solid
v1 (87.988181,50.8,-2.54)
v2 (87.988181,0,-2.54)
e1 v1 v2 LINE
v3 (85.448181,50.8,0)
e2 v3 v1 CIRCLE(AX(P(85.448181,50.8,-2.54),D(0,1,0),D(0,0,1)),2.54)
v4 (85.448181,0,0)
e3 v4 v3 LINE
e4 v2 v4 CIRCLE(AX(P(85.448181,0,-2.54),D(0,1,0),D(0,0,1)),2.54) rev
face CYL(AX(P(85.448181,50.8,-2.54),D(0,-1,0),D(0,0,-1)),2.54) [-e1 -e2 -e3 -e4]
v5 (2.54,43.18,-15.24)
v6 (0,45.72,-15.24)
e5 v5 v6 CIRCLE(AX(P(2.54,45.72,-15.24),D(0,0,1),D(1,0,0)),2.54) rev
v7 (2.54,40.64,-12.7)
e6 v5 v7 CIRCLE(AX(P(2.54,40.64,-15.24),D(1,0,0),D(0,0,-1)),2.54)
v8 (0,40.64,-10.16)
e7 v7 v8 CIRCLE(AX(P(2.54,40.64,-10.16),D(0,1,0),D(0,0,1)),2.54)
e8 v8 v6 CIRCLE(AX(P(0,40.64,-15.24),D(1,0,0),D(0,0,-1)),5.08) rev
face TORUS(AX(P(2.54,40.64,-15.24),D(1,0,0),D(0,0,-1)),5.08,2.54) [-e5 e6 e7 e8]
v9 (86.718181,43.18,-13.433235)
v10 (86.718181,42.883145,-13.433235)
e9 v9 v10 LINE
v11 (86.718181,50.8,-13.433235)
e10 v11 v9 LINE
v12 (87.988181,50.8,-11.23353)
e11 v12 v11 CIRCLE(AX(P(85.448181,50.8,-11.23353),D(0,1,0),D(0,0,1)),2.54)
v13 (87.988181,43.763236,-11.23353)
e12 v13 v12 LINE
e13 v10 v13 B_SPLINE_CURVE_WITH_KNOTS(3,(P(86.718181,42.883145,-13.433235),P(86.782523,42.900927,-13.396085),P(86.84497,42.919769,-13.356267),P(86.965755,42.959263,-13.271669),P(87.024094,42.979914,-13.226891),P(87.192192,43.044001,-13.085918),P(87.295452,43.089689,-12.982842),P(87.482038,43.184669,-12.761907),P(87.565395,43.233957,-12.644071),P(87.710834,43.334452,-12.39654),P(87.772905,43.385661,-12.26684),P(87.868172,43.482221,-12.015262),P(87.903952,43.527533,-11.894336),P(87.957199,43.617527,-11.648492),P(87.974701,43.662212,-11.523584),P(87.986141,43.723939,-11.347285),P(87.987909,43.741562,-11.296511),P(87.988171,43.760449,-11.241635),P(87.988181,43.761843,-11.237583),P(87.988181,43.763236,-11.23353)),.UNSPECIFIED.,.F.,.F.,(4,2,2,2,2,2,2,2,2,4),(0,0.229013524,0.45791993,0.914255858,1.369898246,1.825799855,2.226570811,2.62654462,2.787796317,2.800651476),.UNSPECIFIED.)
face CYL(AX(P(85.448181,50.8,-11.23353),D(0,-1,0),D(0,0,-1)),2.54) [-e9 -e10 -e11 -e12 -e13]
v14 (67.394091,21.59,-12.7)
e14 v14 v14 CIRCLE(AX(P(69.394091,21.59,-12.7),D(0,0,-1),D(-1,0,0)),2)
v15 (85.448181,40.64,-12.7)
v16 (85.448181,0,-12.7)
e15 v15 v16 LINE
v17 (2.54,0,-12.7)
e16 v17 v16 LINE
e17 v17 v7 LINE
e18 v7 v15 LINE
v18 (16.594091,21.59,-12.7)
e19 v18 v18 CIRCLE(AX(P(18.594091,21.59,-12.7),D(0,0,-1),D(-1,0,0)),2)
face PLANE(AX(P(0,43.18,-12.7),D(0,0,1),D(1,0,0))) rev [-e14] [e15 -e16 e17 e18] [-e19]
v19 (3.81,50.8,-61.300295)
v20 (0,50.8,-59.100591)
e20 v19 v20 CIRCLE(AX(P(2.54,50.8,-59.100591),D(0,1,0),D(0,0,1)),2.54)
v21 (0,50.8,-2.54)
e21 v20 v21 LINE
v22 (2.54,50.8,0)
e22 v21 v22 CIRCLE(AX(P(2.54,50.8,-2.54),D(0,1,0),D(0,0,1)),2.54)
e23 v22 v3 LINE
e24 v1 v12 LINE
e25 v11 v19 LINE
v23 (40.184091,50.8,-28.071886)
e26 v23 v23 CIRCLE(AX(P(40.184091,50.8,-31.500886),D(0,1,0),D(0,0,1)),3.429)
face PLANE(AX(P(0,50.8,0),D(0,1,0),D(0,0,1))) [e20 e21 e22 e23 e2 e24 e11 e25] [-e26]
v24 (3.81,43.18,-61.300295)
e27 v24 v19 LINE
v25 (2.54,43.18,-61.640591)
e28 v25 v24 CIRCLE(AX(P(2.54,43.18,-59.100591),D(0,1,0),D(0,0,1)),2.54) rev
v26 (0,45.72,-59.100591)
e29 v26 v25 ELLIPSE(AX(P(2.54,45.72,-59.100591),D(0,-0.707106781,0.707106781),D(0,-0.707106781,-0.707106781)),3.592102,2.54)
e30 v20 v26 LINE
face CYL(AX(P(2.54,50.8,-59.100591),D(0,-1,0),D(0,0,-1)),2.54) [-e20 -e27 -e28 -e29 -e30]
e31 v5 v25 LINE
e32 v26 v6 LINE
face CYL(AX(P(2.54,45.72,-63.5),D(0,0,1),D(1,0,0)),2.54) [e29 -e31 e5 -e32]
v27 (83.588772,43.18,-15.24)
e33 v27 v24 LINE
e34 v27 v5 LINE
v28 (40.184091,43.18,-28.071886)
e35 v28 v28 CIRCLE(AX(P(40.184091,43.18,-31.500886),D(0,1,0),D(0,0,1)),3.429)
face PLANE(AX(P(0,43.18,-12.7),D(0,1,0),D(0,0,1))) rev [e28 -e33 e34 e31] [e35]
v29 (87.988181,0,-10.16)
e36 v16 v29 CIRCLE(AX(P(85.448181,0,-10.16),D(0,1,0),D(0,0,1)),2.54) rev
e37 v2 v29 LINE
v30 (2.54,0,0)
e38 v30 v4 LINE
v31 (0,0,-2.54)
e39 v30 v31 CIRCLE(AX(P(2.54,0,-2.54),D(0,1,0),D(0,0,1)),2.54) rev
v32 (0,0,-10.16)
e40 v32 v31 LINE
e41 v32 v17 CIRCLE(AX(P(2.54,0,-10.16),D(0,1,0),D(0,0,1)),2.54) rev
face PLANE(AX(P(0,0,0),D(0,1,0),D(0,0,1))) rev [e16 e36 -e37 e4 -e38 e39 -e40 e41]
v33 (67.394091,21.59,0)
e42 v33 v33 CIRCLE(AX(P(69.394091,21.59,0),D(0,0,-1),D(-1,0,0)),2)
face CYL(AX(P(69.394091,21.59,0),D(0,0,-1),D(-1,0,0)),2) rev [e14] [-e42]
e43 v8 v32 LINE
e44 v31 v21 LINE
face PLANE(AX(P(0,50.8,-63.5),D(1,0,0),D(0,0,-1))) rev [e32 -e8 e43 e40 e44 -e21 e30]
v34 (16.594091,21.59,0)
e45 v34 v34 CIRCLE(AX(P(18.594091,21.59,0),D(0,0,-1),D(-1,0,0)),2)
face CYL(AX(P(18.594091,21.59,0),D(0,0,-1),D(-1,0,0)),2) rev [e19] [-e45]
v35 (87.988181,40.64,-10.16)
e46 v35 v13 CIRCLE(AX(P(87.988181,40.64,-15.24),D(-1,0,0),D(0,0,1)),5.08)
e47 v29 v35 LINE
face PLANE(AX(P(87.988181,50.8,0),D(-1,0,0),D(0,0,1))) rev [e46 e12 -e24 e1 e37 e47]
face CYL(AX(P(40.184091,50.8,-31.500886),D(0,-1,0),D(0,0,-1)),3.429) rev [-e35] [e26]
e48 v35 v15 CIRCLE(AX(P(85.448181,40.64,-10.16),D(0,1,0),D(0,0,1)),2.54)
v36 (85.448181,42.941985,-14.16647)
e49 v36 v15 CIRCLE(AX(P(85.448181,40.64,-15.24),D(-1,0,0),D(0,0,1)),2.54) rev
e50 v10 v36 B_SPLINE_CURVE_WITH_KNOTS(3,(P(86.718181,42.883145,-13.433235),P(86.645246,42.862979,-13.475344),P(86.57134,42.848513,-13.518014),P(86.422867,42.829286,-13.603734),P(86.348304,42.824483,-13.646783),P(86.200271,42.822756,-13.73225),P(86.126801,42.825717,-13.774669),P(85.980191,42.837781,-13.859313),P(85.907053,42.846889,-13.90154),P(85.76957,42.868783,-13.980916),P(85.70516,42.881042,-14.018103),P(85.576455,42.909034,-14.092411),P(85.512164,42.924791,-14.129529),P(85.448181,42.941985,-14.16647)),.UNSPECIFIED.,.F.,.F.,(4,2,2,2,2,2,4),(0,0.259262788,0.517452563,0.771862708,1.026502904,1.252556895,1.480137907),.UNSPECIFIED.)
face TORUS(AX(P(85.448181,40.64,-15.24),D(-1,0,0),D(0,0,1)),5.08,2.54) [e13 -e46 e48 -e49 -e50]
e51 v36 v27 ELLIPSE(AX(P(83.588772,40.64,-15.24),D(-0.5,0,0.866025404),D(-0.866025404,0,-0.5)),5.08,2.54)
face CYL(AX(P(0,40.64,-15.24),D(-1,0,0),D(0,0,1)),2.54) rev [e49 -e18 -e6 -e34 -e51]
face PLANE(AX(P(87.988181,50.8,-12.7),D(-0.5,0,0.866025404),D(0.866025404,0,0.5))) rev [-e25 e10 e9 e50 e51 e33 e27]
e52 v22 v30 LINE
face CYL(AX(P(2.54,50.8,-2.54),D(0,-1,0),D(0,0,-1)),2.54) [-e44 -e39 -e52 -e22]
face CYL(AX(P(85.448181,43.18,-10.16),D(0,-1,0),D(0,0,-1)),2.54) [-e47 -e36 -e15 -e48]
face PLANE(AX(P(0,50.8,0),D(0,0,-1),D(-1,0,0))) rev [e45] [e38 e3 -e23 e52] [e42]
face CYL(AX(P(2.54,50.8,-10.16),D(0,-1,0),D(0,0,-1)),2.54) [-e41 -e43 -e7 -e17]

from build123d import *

# Parameters (mm, degrees)
SKETCH1_R           = 3.429
BOSS_EXTRUDE1_DEPTH = 50.8
SKETCH2_W           = 50.8
SKETCH2_H           = 43.18
CUT_EXTRUDE1_DEPTH  = 120.811560377
SKETCH3_R           = 2
CUT_EXTRUDE2_DEPTH  = 114.592253257
FILLET1_START       = -1
FILLET1_DEPTH       = 41.6399999
FILLET1_START_2     = 4.794504
FILLET1_2_DEPTH     = 47.205496
FILLET1_START_3     = 40.6399999
FILLET1_3_DEPTH     = 2.5400001
FILLET1_START_4     = -61.640591048
FILLET1_5_DEPTH     = 46.400591048


with BuildPart() as part:
    # Sketch1 → Boss-Extrude1 (new body)
    with BuildSketch(Plane(origin=(0, 0, 0), x_dir=(1, 0, 0), z_dir=(0, 1, 0))):
        Polygon((0, 0), (87.988181024, 0), (87.988181024, 12.7), (0, 63.5), align=None)
        with Locations(Location((40.184090512, 31.500886423, 0), (0, 0, 270))):
            Circle(SKETCH1_R, mode=Mode.SUBTRACT)
    extrude(amount=BOSS_EXTRUDE1_DEPTH)

    # Sketch2 → Cut-Extrude1 (cut, through all)
    with BuildSketch(Plane(origin=(87.988181024, 0, 0), x_dir=(0, 0, -1), z_dir=(1, 0, 0))):
        with Locations((38.1, 21.59)):
            Rectangle(SKETCH2_W, SKETCH2_H)
    extrude(amount=-CUT_EXTRUDE1_DEPTH, mode=Mode.SUBTRACT)

    # Sketch3 → Cut-Extrude2 (cut, through all)
    with BuildSketch(Plane(origin=(0, 0, -12.7), x_dir=(-1, 0, 0), z_dir=(0, 0, -1))):
        with Locations((-69.394090512, 21.59)):
            Circle(SKETCH3_R)
        with Locations((-18.594090512, 21.59)):
            Circle(SKETCH3_R)
    extrude(amount=-CUT_EXTRUDE2_DEPTH, mode=Mode.SUBTRACT)

    # Fillet1: read off the stored shape, not the designer's step
    # Fillet1 outline → Fillet1 (cut)
    with BuildSketch(Plane(origin=(0, 0, 0), x_dir=(1, 0, 0), z_dir=(0, 1, 0)).offset(FILLET1_START)):
        with BuildLine():
            ThreePointArc((85.448181024, 12.7), (87.244232248, 11.956051225), (87.988181024, 10.16))
            Line((87.988181024, 10.16), (87.988181024, 12.7))
            Line((87.988181024, 12.7), (85.448181024, 12.7))
        make_face()
        with BuildLine():
            ThreePointArc((0, 10.16), (0.743948776, 11.956051224), (2.54, 12.7))
            Line((2.54, 12.7), (0, 12.7))
            Line((0, 12.7), (0, 10.16))
        make_face()
        with BuildLine():
            Line((87.988181024, 0), (87.988181024, 2.54))
            ThreePointArc((87.988181024, 2.54), (87.244232248, 0.743948775), (85.448181024, 0))
            Line((85.448181024, 0), (87.988181024, 0))
        make_face()
        with BuildLine():
            ThreePointArc((2.54, 0), (0.743948776, 0.743948776), (0, 2.54))
            Line((0, 2.54), (0, 0))
            Line((0, 0), (2.54, 0))
        make_face()
    extrude(amount=FILLET1_DEPTH, mode=Mode.SUBTRACT)

    # Fillet1 2 outline → Fillet1 2 (cut)
    with BuildSketch(Plane(origin=(0, 0, 0), x_dir=(1, 0, 0), z_dir=(0, 1, 0)).offset(FILLET1_START_2)):
        with BuildLine():
            Line((87.988181024, 11.233530316), (87.988181024, 12.7))
            Line((87.988181024, 12.7), (86.718181024, 13.433234842))
            ThreePointArc((86.718181024, 13.433234842), (87.64788555, 12.503530316), (87.988181024, 11.233530316))
        make_face()
        with BuildLine():
            Line((87.988181024, 0), (87.988181024, 2.54))
            ThreePointArc((87.988181024, 2.54), (87.244232248, 0.743948775), (85.448181024, 0))
            Line((85.448181024, 0), (87.988181024, 0))
        make_face()
        with BuildLine():
            ThreePointArc((2.54, 0), (0.743948776, 0.743948776), (0, 2.54))
            Line((0, 2.54), (0, 0))
            Line((0, 0), (2.54, 0))
        make_face()
        with BuildLine():
            Line((0, 63.5), (0, 59.100590949))
            ThreePointArc((0, 59.100590949), (1.27, 61.300295474), (3.81, 61.300295474))
            Line((3.81, 61.300295474), (0, 63.5))
        make_face()
    extrude(amount=FILLET1_2_DEPTH, mode=Mode.SUBTRACT)

    # Fillet1 3 outline → Fillet1 3 (add)
    with BuildSketch(Plane(origin=(0, 0, 0), x_dir=(1, 0, 0), z_dir=(0, 1, 0)).offset(FILLET1_START_3)):
        with BuildLine():
            Line((0, 12.7), (87.52208234, 12.7))
            ThreePointArc((87.52208234, 12.7), (87.159854864, 13.110168978), (86.718181024, 13.433234842))
            Line((86.718181024, 13.433234842), (3.81, 61.300295474))
            ThreePointArc((3.81, 61.300295474), (1.27, 61.300295474), (0, 59.100590949))
            Line((0, 59.100590949), (0, 12.7))
        make_face()
    extrude(amount=FILLET1_3_DEPTH)

    # Fillet1 4 outline → Fillet1 4 (revolve, cut)
    with BuildSketch(Plane(origin=(0, 40.64, -15.24), x_dir=(0, 1, 0), z_dir=(0, 0, -1))):
        with BuildLine():
            Line((5.08, 87.988181024), (0, 87.988181024))
            Line((0, 87.988181024), (0, 0))
            Line((0, 0), (5.08, 0))
            ThreePointArc((5.08, 0), (3.283948776, 0.743948776), (2.54, 2.54))
            Line((2.54, 2.54), (2.54, 85.448181024))
            ThreePointArc((2.54, 85.448181024), (3.283948775, 87.244232248), (5.08, 87.988181024))
        make_face()
    revolve(axis=Axis((0, 40.64, -15.24), (1, 0, 0)), mode=Mode.SUBTRACT)

    # Fillet1 5 outline → Fillet1 5 (cut)
    with BuildSketch(Plane.XY.offset(FILLET1_START_4)):
        with BuildLine():
            Line((85, 43.18), (2.54, 43.18))
            ThreePointArc((2.54, 43.18), (0.743948776, 43.923948776), (0, 45.72))
            Line((0, 45.72), (0, 40.6399999))
            Line((0, 40.6399999), (85, 40.6399999))
            Line((85, 40.6399999), (85, 43.18))
        make_face()
    extrude(amount=FILLET1_5_DEPTH, mode=Mode.SUBTRACT)


solid = part.part
